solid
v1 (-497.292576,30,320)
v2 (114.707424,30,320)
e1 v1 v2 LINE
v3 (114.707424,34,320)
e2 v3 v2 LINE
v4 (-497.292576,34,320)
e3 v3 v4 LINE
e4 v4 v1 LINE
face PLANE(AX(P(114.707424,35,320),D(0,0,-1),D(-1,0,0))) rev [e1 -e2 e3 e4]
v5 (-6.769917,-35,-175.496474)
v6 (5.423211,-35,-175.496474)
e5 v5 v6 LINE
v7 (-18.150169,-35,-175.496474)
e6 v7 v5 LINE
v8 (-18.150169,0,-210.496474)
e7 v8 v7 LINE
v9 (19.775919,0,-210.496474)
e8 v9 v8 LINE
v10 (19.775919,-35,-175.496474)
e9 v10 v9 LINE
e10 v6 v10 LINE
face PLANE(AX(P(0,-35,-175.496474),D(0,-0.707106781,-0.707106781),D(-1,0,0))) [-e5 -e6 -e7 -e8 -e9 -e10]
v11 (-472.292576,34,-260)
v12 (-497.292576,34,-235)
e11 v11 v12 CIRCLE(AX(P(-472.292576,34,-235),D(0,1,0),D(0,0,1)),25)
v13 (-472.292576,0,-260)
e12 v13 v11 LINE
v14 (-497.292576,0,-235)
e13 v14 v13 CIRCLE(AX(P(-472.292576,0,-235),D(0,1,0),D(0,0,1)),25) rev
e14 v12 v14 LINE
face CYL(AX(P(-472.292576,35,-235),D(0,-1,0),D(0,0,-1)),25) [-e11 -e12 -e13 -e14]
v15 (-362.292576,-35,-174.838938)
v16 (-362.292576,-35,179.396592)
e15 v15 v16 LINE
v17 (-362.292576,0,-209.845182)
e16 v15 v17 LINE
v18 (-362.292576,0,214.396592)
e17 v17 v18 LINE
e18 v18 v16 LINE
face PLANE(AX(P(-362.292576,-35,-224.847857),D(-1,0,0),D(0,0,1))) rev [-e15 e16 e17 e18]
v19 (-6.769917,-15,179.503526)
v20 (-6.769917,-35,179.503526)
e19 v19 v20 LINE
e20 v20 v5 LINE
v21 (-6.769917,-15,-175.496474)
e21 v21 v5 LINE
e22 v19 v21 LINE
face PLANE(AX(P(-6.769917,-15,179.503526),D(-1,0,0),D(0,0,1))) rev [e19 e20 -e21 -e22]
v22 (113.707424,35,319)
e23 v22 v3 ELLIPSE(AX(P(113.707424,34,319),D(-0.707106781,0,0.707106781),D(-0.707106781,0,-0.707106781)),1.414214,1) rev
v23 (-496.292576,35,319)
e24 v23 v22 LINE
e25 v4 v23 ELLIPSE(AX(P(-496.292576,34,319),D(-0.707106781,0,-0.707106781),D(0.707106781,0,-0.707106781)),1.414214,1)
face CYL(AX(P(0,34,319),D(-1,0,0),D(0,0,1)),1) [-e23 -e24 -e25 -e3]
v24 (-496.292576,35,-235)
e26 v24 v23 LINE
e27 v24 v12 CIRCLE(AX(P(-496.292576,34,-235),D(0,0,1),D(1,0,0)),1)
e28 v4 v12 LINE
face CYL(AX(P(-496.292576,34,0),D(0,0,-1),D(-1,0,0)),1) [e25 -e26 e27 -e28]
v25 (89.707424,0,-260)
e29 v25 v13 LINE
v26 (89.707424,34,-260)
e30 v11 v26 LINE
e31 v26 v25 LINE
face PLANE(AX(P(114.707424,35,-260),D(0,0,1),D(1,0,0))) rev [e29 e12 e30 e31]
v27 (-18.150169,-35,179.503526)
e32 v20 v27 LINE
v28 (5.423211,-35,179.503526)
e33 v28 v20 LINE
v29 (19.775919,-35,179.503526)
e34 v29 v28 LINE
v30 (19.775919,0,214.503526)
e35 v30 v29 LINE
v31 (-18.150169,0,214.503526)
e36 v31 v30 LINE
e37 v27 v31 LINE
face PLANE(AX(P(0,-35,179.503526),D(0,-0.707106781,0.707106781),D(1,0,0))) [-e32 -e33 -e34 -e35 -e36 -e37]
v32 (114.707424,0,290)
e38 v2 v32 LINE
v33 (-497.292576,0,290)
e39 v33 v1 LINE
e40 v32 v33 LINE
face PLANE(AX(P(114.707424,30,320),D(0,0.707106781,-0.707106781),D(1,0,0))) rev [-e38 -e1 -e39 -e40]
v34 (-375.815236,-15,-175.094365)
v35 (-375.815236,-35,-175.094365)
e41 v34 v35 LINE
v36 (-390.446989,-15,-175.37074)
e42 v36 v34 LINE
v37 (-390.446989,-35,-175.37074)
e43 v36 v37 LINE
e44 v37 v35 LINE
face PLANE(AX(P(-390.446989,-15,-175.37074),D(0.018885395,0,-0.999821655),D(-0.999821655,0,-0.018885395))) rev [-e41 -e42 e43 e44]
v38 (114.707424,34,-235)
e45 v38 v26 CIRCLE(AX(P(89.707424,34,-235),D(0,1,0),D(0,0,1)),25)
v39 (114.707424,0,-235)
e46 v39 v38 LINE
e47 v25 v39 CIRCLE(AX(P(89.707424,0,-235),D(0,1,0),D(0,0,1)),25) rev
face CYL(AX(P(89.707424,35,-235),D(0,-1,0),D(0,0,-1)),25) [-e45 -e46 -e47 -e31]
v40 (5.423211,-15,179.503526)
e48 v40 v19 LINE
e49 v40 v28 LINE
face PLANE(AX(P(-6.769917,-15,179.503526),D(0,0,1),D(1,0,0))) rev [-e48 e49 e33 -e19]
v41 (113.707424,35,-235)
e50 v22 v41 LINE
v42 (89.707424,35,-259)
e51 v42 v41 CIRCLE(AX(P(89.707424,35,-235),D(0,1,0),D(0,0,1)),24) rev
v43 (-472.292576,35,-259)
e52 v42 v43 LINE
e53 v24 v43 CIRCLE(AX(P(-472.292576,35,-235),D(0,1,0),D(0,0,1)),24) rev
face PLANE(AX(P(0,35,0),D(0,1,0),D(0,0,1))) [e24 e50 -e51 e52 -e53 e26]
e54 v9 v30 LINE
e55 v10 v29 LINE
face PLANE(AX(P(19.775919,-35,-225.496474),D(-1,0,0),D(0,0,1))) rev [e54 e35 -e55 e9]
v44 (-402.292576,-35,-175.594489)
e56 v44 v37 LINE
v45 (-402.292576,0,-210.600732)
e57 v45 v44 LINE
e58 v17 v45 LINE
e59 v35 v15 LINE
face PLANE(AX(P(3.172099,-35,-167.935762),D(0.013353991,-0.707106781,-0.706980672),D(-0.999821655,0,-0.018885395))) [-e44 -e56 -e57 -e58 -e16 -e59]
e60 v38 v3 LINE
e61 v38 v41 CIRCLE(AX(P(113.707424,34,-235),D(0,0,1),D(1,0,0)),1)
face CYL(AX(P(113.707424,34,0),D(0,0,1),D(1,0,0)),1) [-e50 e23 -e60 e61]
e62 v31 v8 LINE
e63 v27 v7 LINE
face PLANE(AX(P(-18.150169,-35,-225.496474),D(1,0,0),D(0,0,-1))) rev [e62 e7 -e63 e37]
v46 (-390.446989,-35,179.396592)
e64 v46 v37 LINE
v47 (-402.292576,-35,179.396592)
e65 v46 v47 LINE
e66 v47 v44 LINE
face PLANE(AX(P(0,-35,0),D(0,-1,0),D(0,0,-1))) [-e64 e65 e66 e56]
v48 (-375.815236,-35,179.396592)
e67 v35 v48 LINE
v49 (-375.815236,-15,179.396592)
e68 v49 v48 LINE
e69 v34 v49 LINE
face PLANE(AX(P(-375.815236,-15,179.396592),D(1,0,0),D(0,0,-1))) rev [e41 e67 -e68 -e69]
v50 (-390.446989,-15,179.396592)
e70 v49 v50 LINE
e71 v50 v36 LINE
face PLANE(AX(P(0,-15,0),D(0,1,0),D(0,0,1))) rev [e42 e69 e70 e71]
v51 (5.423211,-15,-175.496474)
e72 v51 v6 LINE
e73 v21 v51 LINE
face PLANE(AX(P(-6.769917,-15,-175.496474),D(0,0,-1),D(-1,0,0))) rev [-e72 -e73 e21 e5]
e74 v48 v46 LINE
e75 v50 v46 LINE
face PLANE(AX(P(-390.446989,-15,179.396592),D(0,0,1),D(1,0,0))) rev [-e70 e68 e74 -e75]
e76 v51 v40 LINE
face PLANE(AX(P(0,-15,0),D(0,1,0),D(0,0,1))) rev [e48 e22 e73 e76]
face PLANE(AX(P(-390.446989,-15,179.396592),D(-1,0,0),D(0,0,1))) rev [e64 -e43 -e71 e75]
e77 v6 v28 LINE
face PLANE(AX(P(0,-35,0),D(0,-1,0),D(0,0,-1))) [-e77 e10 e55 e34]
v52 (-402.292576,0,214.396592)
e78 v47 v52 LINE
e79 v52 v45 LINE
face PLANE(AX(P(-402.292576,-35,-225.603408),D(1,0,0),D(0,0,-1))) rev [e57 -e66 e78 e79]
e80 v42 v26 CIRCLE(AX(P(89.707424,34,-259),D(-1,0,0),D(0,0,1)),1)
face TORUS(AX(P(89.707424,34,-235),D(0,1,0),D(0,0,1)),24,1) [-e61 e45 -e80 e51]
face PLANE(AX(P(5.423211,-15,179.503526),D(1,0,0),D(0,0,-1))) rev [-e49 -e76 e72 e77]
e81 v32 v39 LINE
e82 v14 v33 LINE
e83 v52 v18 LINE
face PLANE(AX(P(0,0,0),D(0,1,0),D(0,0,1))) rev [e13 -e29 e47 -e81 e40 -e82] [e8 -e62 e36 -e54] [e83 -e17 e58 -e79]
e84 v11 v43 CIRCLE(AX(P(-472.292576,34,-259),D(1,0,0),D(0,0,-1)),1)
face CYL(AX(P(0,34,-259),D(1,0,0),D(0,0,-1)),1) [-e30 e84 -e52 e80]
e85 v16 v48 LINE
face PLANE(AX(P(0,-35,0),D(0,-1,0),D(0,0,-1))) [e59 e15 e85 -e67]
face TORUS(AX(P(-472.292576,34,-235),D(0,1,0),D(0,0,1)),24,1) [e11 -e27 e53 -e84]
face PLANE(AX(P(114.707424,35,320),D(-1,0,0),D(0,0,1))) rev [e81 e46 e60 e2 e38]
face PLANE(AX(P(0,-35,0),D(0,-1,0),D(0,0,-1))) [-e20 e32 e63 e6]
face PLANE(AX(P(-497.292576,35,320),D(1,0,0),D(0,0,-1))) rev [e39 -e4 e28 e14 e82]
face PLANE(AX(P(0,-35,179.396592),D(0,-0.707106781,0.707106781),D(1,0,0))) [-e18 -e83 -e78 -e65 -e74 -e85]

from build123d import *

# Parameters (mm, degrees)
SKETCH1_W           = 612
SKETCH1_H           = 580
BOSS_EXTRUDE1_DEPTH = 35
FILLET9_R           = 1
CHAMFER1_SIZE       = 30
FILLET10_R          = 25
SKETCH3_W           = 37.926087763
SKETCH3_H           = 455
BOSS_EXTRUDE2_DEPTH = 35
CHAMFER2_SIZE       = 50
SKETCH4_W           = 12.193127302
SKETCH4_H           = 355
CUT_EXTRUDE1_DEPTH  = 20


with BuildPart() as part:
    # Sketch1 → Boss-Extrude1 (new body)
    with BuildSketch(Plane(origin=(0, 0, 0), x_dir=(1, 0, 0), z_dir=(0, 1, 0))):
        with Locations((-191.292576419, -30)):
            Rectangle(SKETCH1_W, SKETCH1_H)
    extrude(amount=BOSS_EXTRUDE1_DEPTH)

    # Fillet9
    fillet9_edges = [part.edges().sort_by_distance(p)[0] for p in [
        (114.707423581, 35, 30),
        (-191.292576419, 35, -260),
        (-497.292576419, 35, 30),
        (-191.292576419, 35, 320),
    ]]
    fillet(fillet9_edges, radius=FILLET9_R)

    # Chamfer1
    chamfer1_edges = [part.edges().sort_by_distance(p)[0] for p in [
        (-191.292576419, 0, 320),
    ]]
    chamfer(chamfer1_edges, length=CHAMFER1_SIZE)

    # Fillet10
    # the kernel refuses this fillet: 25 mm, written as the material it takes off along each edge
    with BuildSketch(Plane(origin=(89.707423581, 35, -235), x_dir=(1, 0, 0), z_dir=(0, 0, 1))) as fillet10_piece_1:
        with BuildLine():
            CenterArc((24, -1), 1, 0, 90)
            Line((25, -1), (25, 0))
            Line((25, 0), (24, 0))
        make_face()
    revolve(axis=Axis((89.707423581, 35, -235), (0, 1, 0)), revolution_arc=90, mode=Mode.SUBTRACT)
    with BuildSketch(Plane(origin=(-472.292576419, 35, -235), x_dir=(0, 0, -1), z_dir=(1, 0, 0))) as fillet10_piece_2:
        with BuildLine():
            CenterArc((24, -1), 1, 0, 90)
            Line((25, -1), (25, 0))
            Line((25, 0), (24, 0))
        make_face()
    revolve(axis=Axis((-472.292576419, 35, -235), (0, 1, 0)), revolution_arc=90, mode=Mode.SUBTRACT)
    with BuildSketch(Plane(origin=(-497.292576419, -62.5, -260), x_dir=(0, 0, 1), z_dir=(0, 1, 0))) as fillet10_piece_3:
        with BuildLine():
            CenterArc((FILLET10_R, FILLET10_R), FILLET10_R, 180, 90)
            Line((0, FILLET10_R), (0, 0))
            Line((0, 0), (FILLET10_R, 0))
        make_face()
    extrude(amount=97.5, mode=Mode.SUBTRACT)
    with BuildSketch(Plane(origin=(114.707423581, -62.5, -260), x_dir=(0, 0, 1), z_dir=(0, 1, 0))) as fillet10_piece_4:
        with BuildLine():
            CenterArc((FILLET10_R, -FILLET10_R), FILLET10_R, 90, 90)
            Line((0, -FILLET10_R), (0, 0))
            Line((0, 0), (FILLET10_R, 0))
        make_face()
    extrude(amount=97.5, mode=Mode.SUBTRACT)

    # Sketch3 → Boss-Extrude2 (add)
    with BuildSketch(Plane.XZ):
        with Locations((0.812875154, 2.003525588)):
            Rectangle(SKETCH3_W, SKETCH3_H)
        Polygon((-362.292576419, -224.84785724), (-402.292576419, -225.603407802), (-402.292576419, 229.396592198), (-362.292576419, 229.396592198), align=None)
    extrude(amount=BOSS_EXTRUDE2_DEPTH)

    # Chamfer2
    # the kernel refuses this chamfer: 50 mm, written as the material it takes off along each edge
    with BuildSketch(Plane(origin=(148.360068433, -35, -225.496474412), x_dir=(0, 0.9996219169112966, -0.027495876610586594), z_dir=(-1, 0, 0))) as chamfer2_piece_1_section:
        Polygon((CHAMFER2_SIZE * 0.999621916911, -CHAMFER2_SIZE * 0.0274958766106), (-CHAMFER2_SIZE * 0.0274958766106, -CHAMFER2_SIZE * 0.999621916911), (0, 0), align=None)
    chamfer2_piece_1 = extrude(amount=295.09438656, mode=Mode.PRIVATE)
    chamfer2_piece_1 = split(chamfer2_piece_1, bisect_by=Plane(origin=(0.812875153, 0, -207.548086942), z_dir=(0, -1, 0)), keep=Keep.TOP, mode=Mode.PRIVATE)
    add(chamfer2_piece_1, mode=Mode.SUBTRACT)
    with BuildSketch(Plane(origin=(-233.731359359, -35, -222.419494743), x_dir=(0.0005192705001048889, 0.9996219169112966, -0.027490972858964104), z_dir=(-0.999821655017895, 0, -0.018885395343422682))) as chamfer2_piece_2_section:
        Polygon((CHAMFER2_SIZE * 0.999621916911, -CHAMFER2_SIZE * 0.0274958766106), (-CHAMFER2_SIZE * 0.0274958766106, -CHAMFER2_SIZE * 0.999621916911), (0, 0), align=None)
    chamfer2_piece_2 = extrude(amount=297.175433868, mode=Mode.PRIVATE)
    chamfer2_piece_2 = split(chamfer2_piece_2, bisect_by=Plane(origin=(-382.631538812, 0, -207.280446055), z_dir=(0, -1, 0)), keep=Keep.TOP, mode=Mode.PRIVATE)
    add(chamfer2_piece_2, mode=Mode.SUBTRACT)
    with BuildSketch(Plane(origin=(-530.876725818, -35, 229.396592198), x_dir=(0, 0.9996219169112966, 0.027495876610586594), z_dir=(1, 0, 0))) as chamfer2_piece_3_section:
        Polygon((CHAMFER2_SIZE * 0.999621916911, -CHAMFER2_SIZE * 0.0274958766106), (-CHAMFER2_SIZE * 0.0274958766106, -CHAMFER2_SIZE * 0.999621916911), (0, 0), align=None)
    chamfer2_piece_3 = extrude(amount=297.168298797, mode=Mode.PRIVATE)
    chamfer2_piece_3 = split(chamfer2_piece_3, bisect_by=Plane(origin=(-382.292576419, 0, 211.448204728), z_dir=(0, -1, 0)), keep=Keep.TOP, mode=Mode.PRIVATE)
    add(chamfer2_piece_3, mode=Mode.SUBTRACT)
    with BuildSketch(Plane(origin=(-146.734318126, -35, 229.503525588), x_dir=(0, 0.9996219169112966, 0.027495876610586594), z_dir=(1, 0, 0))) as chamfer2_piece_4_section:
        Polygon((CHAMFER2_SIZE * 0.999621916911, -CHAMFER2_SIZE * 0.0274958766106), (-CHAMFER2_SIZE * 0.0274958766106, -CHAMFER2_SIZE * 0.999621916911), (0, 0), align=None)
    chamfer2_piece_4 = extrude(amount=295.09438656, mode=Mode.PRIVATE)
    chamfer2_piece_4 = split(chamfer2_piece_4, bisect_by=Plane(origin=(0.812875153, 0, 211.555138118), z_dir=(0, -1, 0)), keep=Keep.TOP, mode=Mode.PRIVATE)
    add(chamfer2_piece_4, mode=Mode.SUBTRACT)

    # Sketch4 → Cut-Extrude1 (cut)
    with BuildSketch(Plane.XZ.offset(35)):
        with Locations((-0.673352928, 2.003525588)):
            Rectangle(SKETCH4_W, SKETCH4_H)
        Polygon((-390.446989022, 179.396592198), (-390.446989022, -175.370740457), (-375.815236259, -175.094364731), (-375.815236259, 179.396592198), align=None)
    extrude(amount=-CUT_EXTRUDE1_DEPTH, mode=Mode.SUBTRACT)


solid = part.part
